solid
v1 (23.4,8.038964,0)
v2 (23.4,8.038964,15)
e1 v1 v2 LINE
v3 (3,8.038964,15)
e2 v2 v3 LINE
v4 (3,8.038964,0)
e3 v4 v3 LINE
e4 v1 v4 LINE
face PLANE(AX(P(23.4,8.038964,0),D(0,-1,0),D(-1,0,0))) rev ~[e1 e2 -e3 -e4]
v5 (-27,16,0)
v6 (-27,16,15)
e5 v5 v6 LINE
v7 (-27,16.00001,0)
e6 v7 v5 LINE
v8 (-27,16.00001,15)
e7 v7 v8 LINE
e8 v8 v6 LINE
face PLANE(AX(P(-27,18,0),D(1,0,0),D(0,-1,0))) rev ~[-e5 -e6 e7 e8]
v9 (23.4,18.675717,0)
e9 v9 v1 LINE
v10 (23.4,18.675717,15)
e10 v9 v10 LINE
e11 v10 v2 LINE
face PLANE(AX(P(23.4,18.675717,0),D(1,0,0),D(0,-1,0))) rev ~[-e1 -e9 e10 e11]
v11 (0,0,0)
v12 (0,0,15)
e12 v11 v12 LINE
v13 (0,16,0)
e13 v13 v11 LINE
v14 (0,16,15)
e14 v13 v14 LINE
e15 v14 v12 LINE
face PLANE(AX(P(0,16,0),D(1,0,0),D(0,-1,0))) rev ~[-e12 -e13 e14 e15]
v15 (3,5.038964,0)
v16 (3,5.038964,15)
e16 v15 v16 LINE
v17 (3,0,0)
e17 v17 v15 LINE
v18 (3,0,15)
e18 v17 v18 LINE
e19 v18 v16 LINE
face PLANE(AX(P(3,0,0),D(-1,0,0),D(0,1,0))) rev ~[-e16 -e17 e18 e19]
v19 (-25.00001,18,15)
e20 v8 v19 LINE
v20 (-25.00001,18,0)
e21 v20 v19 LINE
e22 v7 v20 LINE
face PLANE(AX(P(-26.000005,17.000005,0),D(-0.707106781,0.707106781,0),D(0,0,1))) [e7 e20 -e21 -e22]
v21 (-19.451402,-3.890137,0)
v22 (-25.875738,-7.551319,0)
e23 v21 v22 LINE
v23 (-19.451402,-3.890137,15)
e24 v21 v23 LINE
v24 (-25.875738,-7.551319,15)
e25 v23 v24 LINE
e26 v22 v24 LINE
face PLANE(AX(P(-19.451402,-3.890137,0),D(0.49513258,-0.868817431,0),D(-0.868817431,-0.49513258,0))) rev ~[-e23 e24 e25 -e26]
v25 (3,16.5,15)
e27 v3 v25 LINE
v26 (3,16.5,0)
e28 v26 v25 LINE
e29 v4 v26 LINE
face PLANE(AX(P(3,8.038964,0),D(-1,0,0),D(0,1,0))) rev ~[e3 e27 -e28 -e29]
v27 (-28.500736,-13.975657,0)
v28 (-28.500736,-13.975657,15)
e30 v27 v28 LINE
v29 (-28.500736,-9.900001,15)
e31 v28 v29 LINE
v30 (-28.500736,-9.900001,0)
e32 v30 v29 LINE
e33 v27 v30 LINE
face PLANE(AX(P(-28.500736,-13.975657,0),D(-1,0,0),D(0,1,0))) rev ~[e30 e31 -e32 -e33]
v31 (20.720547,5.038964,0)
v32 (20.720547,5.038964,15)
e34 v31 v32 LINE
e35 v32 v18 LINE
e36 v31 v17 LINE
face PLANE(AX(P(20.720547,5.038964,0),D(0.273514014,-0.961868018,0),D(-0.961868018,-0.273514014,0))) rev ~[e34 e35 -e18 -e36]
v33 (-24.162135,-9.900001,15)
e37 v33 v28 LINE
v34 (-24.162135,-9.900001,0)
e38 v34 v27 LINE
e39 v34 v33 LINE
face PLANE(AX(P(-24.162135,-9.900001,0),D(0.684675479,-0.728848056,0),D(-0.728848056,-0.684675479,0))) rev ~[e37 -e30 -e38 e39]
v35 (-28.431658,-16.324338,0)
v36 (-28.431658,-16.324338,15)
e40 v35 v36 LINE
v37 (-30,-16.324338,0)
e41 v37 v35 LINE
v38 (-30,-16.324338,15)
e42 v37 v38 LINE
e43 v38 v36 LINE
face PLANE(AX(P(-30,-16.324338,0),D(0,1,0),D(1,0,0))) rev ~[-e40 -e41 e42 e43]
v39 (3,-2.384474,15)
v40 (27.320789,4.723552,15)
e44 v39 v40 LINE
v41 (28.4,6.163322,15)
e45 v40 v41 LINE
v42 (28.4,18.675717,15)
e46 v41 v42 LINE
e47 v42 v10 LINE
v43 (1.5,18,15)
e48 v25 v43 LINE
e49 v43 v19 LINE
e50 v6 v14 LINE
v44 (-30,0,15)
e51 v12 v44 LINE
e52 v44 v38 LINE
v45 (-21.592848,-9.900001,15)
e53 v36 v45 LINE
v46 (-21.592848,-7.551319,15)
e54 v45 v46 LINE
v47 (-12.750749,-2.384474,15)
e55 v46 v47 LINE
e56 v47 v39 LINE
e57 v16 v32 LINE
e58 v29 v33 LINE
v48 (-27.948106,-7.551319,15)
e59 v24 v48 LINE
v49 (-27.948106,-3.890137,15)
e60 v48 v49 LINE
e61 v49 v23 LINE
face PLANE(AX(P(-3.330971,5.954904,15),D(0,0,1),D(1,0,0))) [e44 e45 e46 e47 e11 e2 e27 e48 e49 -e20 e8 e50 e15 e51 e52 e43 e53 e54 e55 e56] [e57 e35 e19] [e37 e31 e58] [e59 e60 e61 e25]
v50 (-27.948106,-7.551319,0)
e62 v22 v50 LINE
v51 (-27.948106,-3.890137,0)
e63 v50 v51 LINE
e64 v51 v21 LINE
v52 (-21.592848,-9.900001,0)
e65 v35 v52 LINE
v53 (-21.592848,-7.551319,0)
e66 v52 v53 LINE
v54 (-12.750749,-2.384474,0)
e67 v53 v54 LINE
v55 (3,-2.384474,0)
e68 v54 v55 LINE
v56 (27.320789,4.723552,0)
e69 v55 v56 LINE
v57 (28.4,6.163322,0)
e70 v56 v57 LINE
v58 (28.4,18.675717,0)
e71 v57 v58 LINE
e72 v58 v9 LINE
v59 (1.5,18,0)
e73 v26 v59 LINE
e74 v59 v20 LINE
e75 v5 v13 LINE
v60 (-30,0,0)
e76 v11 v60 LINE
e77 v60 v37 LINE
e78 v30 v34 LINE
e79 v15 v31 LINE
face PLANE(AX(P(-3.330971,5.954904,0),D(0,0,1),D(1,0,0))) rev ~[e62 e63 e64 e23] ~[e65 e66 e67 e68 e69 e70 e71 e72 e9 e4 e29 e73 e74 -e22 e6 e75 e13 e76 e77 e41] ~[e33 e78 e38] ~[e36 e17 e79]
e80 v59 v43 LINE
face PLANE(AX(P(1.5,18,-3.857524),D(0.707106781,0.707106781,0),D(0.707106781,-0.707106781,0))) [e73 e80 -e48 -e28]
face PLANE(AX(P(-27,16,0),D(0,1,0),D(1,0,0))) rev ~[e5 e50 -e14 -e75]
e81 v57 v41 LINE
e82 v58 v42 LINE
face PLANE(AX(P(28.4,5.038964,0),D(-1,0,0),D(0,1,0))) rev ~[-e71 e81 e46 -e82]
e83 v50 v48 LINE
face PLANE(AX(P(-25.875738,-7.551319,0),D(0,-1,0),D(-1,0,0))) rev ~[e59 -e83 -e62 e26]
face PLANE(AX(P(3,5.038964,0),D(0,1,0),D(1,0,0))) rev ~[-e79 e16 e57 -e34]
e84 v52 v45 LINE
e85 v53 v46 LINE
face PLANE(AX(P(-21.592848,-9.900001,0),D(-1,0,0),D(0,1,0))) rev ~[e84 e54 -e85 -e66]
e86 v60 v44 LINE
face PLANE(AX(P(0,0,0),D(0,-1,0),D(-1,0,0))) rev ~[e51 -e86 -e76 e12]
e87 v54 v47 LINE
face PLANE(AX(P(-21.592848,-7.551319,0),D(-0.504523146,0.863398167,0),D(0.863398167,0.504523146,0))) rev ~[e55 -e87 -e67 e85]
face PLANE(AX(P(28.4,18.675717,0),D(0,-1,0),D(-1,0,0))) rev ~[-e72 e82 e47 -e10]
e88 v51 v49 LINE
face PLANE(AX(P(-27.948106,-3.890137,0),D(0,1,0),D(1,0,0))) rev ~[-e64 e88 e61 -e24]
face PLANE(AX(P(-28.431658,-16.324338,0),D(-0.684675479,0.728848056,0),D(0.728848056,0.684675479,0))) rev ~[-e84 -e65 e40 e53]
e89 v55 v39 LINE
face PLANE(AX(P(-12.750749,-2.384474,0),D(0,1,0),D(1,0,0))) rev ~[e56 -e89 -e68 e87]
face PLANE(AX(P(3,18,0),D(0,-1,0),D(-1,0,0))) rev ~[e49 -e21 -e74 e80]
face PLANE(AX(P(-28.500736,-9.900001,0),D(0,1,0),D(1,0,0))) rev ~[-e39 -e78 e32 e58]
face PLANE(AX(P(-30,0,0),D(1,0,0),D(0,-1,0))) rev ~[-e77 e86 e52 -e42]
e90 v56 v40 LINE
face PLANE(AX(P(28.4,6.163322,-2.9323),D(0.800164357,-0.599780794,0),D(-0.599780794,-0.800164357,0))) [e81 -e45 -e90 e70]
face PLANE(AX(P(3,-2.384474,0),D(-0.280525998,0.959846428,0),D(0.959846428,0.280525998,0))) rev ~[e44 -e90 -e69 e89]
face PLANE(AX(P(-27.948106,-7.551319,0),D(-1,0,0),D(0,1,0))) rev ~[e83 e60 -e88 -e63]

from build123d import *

# Parameters (mm, degrees)
F1_DEPTH    = 15
F2_T1_DEPTH = 22.7150489639
F2_T3_DEPTH = 20.8646002419
F3_SIZE     = 1.99999


# Not quite as in the source:
# - a fillet or chamfer that OpenCascade refuses, or shapes differently, is made with other operations: its cross-section is extruded or revolved along the edge and cut away or added
# - a fillet or chamfer is up to 0.001 mm smaller than in the source, because OpenCascade refuses the exact size


with BuildPart() as f1:
    # F0 (on Top) → F1 (new body)
    with BuildSketch(Plane.XY):
        Polygon((0, 16), (0, 0), (-30, 0), (-30, -2.3844742682), (-30, -16.3243375719), (-28.4316577017, -16.3243375719), (-21.5928480029, -9.9000008777), (-21.5928480029, -7.5513185002), (-12.7507485449, -2.3844742682), (3, -2.3844742682), (28.4, 5.0389636308), (28.4, 18.6757165939), (23.4, 18.6757165939), (23.4, 8.0389636308), (3, 8.0389636308), (3, 18), (-27, 18), (-27, 16), align=None)
        Polygon((-28.5007357597, -13.9756565914), (-28.5007357597, -10.7289487496), (-28.5007357597, -9.9000008777), (-24.1621347258, -9.9000008777), align=None, mode=Mode.SUBTRACT)
        Polygon((-27.9481057078, -3.890137421), (-19.4514021277, -3.890137421), (-25.8757378906, -7.5513185002), (-27.9481057078, -7.5513185002), align=None, mode=Mode.SUBTRACT)
        Polygon((3, 5.0389636308), (20.7205470651, 5.0389636308), (3, 0), align=None, mode=Mode.SUBTRACT)
    extrude(amount=F1_DEPTH)

    # F2: chamfer of 1.5 on 2 edges, made by hand

    # F2_s2 → F2_t1 (cut)
    with BuildSketch(Plane.XY.offset(-3.8575244819)):
        Polygon((1.5, 18), (3, 16.5), (3, 18), align=None)
    extrude(amount=F2_T1_DEPTH, mode=Mode.SUBTRACT)

    # F2_s4 → F2_t3 (cut)
    with BuildSketch(Plane.XY.offset(-2.932300121)):
        Polygon((28.4, 6.163321624), (27.3207889969, 4.7235519827), (28.4, 5.0389636308), align=None)
    extrude(amount=F2_T3_DEPTH, mode=Mode.SUBTRACT)

    # F3 (size 2 in the source; OpenCascade refuses exactly that, so slightly less here)
    f3_edges = [f1.edges().sort_by_distance(p)[0] for p in [
        (-27, 18, 7.5),
    ]]
    chamfer(f3_edges, length=F3_SIZE)


solid = f1.part
